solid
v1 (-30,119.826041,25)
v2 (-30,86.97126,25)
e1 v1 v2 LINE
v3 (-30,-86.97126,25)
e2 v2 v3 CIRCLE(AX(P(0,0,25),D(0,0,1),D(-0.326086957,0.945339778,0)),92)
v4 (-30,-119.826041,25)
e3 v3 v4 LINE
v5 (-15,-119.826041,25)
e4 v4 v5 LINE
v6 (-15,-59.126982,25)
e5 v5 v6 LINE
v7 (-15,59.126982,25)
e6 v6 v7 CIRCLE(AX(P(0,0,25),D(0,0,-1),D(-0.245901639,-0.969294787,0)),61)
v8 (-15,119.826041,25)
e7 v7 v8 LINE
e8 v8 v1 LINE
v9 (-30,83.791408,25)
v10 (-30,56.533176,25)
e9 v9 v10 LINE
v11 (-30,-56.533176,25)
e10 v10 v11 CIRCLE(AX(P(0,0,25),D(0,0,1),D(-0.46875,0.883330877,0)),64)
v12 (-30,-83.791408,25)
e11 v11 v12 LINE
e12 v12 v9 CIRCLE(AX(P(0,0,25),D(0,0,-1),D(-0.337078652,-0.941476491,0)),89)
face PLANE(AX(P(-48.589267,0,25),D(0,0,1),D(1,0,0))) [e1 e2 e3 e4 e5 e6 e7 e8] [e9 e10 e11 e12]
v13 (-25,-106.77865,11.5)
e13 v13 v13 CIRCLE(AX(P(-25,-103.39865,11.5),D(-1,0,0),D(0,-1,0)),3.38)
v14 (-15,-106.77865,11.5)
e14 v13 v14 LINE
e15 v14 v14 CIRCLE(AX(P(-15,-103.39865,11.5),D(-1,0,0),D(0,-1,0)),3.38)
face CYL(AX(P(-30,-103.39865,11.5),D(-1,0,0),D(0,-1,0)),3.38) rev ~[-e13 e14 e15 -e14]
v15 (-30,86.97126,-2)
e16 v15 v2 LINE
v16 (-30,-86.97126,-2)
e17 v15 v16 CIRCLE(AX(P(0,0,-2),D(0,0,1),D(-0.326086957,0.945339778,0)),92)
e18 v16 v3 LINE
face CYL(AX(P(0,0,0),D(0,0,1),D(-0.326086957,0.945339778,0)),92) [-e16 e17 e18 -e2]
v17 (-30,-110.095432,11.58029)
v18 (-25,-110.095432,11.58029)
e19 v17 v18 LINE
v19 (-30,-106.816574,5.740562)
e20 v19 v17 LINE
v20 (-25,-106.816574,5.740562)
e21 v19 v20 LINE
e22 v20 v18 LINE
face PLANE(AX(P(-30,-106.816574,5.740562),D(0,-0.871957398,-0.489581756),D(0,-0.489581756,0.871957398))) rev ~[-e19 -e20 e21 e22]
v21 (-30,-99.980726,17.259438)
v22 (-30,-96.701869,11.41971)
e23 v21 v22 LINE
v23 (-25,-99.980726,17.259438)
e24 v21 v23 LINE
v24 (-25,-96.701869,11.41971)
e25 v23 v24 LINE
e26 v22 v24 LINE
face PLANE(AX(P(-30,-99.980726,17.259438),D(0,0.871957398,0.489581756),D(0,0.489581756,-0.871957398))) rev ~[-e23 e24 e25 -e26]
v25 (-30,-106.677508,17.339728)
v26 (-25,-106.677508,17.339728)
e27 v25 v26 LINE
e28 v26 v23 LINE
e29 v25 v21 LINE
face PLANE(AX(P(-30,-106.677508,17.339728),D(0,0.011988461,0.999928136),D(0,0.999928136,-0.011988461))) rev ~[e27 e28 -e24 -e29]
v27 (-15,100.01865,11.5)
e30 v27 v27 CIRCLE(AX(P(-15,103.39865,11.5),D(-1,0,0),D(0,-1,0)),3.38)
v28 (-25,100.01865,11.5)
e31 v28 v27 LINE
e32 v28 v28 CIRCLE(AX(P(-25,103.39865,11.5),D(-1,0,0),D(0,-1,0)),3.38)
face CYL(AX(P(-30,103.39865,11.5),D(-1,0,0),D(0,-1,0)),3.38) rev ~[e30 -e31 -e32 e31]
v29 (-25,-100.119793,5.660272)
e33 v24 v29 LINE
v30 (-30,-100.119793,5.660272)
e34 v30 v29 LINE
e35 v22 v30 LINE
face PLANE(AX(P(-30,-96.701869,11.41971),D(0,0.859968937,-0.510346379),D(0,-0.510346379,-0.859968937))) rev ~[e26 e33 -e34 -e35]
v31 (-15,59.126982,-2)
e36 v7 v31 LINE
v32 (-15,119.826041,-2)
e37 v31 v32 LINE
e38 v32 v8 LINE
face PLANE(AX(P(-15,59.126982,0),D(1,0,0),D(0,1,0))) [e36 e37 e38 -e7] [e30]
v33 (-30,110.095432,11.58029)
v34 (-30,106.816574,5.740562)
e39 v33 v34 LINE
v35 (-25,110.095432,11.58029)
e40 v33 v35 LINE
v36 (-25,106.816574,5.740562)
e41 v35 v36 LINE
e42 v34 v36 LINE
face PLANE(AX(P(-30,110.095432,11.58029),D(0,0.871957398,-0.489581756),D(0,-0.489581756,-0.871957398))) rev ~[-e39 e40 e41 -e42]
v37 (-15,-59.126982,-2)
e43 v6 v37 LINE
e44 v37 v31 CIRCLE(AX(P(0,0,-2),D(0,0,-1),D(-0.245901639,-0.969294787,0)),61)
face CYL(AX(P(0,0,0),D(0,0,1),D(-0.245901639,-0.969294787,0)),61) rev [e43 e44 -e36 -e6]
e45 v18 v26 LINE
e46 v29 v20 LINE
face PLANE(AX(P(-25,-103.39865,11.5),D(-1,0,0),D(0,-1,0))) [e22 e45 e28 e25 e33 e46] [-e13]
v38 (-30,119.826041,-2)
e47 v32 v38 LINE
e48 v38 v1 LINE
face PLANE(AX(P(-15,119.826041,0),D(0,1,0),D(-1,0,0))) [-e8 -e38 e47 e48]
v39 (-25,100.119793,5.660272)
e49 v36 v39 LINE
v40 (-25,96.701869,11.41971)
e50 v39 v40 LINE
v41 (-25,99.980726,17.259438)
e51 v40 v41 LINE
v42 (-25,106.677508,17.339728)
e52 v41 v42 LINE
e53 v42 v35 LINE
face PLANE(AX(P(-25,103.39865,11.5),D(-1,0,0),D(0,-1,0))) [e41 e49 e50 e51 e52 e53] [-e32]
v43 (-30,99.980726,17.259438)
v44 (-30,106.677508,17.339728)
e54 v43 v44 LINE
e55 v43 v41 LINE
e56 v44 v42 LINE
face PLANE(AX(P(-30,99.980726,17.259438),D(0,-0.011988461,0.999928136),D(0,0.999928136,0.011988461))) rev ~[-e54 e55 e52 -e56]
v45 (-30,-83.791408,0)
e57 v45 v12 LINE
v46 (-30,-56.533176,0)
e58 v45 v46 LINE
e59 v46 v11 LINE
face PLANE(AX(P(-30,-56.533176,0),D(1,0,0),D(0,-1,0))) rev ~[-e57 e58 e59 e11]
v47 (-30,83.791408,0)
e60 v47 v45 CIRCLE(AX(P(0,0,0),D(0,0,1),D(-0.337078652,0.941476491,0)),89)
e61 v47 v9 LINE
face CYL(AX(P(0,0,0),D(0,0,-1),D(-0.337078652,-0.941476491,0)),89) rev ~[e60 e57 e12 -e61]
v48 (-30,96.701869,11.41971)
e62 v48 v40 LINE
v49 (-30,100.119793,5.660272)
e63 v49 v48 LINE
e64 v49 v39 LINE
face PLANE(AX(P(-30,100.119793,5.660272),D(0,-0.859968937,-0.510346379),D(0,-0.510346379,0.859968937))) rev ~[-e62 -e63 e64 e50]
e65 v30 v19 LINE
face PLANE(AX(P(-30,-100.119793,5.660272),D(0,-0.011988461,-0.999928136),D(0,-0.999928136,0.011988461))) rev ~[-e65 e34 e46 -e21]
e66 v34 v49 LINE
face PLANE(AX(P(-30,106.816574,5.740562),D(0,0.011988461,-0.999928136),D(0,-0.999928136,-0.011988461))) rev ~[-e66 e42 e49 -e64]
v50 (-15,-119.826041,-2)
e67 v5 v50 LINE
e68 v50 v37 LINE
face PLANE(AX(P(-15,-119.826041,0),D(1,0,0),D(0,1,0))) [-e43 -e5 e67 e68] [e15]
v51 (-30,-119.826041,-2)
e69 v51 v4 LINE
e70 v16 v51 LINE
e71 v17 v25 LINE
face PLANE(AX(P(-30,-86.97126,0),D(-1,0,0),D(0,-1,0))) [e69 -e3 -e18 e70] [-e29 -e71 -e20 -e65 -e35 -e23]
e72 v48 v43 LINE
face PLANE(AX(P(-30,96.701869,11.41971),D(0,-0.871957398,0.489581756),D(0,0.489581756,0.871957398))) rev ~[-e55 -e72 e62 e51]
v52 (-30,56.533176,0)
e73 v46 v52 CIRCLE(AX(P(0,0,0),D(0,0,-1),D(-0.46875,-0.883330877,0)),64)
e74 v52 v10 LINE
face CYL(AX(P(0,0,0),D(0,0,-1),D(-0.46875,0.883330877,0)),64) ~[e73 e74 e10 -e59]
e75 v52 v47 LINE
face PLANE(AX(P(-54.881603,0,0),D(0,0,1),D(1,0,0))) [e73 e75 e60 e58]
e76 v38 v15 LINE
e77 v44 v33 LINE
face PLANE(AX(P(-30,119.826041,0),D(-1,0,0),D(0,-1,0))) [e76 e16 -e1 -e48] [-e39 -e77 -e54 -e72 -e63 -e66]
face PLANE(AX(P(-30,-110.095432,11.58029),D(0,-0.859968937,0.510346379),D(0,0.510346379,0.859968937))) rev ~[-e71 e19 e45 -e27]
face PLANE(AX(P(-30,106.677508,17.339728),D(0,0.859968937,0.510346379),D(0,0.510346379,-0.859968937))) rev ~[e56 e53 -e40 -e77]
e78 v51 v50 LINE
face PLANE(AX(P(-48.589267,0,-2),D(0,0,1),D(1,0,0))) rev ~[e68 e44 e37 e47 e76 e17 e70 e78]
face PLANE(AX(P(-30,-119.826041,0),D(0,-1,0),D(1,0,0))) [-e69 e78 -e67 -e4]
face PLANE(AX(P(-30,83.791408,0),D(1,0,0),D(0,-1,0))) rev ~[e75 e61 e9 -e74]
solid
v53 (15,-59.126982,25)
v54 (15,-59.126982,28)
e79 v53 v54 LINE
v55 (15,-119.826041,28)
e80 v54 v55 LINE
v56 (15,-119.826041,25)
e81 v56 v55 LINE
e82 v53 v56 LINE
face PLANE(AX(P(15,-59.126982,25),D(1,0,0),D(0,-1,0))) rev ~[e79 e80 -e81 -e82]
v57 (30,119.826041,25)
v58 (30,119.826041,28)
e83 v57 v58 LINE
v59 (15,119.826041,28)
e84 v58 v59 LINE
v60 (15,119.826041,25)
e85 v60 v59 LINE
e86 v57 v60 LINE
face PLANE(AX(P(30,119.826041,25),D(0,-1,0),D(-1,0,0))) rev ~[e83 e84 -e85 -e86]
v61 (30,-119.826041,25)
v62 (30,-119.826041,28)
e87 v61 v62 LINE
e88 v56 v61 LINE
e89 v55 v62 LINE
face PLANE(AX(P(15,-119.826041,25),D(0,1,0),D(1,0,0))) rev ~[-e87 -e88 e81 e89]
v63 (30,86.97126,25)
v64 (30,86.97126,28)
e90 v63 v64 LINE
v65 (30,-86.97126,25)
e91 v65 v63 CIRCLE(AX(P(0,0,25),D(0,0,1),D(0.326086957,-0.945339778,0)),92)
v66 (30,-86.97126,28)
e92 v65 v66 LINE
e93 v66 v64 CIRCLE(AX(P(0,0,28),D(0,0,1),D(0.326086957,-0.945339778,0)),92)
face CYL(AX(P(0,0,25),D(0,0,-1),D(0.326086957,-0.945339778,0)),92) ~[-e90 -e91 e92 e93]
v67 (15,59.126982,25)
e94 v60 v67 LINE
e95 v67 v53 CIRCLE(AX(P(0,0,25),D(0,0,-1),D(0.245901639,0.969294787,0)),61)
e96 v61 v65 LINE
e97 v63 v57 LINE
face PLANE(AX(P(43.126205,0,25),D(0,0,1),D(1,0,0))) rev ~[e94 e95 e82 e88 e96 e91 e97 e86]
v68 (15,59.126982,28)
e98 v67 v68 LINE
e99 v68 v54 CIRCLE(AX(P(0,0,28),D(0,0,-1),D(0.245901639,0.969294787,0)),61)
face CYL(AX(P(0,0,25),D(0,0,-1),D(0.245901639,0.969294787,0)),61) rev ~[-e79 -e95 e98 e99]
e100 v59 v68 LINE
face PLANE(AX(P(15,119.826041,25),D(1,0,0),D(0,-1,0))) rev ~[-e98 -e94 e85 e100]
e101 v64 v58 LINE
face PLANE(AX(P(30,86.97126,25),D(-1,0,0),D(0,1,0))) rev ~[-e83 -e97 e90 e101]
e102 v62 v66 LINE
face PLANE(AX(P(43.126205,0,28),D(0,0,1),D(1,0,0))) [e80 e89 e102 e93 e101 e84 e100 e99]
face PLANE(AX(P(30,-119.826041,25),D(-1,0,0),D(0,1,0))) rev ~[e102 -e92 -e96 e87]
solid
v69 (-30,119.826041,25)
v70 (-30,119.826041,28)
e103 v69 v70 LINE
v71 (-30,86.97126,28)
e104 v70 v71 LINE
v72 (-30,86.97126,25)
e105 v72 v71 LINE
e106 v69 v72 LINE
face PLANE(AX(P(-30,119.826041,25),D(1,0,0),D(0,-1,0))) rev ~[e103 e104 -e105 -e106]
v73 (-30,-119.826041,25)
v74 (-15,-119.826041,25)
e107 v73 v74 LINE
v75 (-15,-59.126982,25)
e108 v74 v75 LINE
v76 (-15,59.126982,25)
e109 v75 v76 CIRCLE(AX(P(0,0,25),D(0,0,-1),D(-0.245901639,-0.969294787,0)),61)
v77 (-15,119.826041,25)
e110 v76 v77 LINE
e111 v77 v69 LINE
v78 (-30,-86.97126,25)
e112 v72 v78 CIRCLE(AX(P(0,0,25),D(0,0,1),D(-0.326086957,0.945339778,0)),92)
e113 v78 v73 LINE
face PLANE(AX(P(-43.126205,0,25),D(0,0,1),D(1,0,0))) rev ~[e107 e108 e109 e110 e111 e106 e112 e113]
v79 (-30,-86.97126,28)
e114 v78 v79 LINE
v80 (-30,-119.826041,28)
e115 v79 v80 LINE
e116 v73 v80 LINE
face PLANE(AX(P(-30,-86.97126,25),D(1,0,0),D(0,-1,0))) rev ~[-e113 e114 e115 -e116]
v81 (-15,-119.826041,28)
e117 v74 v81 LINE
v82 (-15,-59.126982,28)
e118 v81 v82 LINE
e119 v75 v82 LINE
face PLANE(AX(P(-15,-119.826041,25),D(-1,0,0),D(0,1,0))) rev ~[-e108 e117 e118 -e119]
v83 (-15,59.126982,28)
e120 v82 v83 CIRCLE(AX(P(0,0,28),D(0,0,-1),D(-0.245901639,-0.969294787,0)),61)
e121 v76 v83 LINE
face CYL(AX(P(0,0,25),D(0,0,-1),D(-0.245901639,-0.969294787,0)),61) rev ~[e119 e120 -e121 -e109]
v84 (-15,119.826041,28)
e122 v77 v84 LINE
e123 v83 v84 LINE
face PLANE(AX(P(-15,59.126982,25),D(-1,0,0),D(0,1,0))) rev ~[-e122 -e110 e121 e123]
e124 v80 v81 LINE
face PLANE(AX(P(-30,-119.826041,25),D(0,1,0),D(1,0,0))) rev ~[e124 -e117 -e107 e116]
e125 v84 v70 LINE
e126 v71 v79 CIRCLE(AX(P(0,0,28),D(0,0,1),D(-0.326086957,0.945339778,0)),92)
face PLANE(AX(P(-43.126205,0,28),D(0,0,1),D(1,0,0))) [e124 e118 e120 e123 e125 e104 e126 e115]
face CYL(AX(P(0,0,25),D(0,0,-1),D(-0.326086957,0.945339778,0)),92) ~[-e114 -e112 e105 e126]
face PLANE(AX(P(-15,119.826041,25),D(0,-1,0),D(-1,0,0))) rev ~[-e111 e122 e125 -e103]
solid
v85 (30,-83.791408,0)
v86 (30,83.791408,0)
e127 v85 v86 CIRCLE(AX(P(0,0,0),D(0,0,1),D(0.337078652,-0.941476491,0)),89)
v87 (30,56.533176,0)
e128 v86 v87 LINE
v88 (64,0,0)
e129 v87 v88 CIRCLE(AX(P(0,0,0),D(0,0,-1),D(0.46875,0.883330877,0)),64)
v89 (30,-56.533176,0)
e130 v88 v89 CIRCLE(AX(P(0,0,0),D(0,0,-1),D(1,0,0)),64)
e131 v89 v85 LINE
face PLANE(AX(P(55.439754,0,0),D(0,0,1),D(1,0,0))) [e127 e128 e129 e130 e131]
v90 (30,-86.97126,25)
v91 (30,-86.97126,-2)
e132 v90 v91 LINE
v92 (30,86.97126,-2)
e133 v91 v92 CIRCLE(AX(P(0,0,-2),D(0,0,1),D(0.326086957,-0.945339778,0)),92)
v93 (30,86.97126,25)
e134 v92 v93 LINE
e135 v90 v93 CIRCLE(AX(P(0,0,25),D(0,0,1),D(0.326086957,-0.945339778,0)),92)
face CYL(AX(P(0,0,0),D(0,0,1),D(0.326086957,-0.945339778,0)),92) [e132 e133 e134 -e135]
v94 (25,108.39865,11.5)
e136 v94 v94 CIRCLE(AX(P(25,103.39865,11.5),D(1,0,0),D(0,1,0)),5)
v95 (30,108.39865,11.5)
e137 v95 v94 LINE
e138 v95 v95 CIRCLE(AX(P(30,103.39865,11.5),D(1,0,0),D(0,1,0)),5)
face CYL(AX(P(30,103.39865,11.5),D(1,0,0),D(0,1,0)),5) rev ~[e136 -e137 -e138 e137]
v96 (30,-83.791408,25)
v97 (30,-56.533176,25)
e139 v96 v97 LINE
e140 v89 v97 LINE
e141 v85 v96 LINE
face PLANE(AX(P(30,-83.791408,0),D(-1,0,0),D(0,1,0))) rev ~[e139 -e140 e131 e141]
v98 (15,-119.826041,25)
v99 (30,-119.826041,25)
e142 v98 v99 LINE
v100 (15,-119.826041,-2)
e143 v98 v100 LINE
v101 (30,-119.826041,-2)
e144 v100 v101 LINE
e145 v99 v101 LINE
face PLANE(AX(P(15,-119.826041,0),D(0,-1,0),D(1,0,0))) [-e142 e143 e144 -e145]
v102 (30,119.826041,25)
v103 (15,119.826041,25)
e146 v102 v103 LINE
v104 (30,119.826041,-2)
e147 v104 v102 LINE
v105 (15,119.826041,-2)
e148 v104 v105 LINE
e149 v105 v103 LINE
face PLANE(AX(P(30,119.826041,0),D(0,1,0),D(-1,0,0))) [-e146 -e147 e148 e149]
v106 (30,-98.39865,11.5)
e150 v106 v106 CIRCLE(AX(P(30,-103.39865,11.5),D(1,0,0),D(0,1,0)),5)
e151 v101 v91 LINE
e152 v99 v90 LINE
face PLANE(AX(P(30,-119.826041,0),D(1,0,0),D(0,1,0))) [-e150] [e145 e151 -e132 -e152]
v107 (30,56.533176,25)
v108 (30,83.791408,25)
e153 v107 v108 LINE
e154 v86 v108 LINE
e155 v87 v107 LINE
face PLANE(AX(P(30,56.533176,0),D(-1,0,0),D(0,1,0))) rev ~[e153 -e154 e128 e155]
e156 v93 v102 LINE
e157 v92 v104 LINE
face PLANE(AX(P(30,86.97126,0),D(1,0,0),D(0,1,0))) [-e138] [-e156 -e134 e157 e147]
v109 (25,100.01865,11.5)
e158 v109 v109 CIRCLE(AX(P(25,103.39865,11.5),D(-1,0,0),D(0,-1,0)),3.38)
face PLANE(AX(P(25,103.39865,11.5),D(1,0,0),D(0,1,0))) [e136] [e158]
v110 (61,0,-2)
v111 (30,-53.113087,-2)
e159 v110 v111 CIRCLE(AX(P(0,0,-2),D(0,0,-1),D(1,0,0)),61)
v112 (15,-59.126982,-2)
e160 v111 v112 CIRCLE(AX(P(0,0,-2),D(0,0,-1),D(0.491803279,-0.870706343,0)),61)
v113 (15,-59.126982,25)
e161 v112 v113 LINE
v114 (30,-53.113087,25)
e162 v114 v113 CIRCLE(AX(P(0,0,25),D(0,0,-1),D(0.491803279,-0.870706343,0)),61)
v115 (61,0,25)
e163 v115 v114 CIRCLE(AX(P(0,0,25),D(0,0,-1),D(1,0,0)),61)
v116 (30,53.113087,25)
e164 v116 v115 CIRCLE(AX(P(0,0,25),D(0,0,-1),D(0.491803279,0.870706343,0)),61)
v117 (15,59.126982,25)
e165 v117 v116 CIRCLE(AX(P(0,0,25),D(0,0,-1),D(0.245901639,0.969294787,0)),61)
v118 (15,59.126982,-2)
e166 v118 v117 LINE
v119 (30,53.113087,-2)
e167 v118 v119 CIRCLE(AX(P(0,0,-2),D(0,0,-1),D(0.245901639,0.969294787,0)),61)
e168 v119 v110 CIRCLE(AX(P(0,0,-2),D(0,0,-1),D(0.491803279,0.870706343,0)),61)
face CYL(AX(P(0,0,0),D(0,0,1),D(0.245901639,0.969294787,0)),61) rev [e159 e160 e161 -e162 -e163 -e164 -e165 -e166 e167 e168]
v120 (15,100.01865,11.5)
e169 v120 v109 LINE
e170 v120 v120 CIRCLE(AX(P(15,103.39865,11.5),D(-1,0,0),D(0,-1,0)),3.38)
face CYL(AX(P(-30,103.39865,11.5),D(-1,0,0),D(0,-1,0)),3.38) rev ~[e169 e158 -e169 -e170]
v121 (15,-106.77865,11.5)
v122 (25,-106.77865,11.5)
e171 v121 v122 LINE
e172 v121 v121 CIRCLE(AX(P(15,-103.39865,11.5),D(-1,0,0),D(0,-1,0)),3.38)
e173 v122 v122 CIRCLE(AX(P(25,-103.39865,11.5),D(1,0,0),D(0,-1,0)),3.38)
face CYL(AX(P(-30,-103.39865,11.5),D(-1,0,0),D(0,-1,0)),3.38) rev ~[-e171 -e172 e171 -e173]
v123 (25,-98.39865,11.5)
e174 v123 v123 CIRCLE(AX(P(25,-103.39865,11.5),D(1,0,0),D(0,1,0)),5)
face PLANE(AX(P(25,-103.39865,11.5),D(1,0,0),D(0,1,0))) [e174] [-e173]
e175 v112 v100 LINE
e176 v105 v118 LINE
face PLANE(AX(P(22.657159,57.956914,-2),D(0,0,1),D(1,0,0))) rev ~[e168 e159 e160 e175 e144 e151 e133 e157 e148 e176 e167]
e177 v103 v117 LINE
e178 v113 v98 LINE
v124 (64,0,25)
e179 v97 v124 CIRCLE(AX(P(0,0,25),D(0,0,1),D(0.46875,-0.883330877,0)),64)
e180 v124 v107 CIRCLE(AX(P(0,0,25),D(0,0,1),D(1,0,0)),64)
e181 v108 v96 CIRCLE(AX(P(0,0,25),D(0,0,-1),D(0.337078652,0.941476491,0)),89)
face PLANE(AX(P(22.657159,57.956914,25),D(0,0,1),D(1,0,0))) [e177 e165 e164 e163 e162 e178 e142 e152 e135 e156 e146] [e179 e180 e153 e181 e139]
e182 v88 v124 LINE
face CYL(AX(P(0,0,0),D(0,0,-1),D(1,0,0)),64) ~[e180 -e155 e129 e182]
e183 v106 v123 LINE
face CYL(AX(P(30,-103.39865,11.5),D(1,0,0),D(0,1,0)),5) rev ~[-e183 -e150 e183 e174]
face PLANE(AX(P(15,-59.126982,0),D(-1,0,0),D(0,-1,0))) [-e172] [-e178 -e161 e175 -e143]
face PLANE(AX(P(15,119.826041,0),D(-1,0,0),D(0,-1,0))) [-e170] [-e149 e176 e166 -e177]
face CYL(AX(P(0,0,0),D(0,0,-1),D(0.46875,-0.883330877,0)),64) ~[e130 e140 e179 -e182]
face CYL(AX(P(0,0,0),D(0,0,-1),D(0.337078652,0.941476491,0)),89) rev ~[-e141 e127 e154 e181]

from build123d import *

# Parameters (mm, degrees)
F1_DEPTH      = 2
F2_DEPTH      = 25
F2_DEPTH_BACK = 2
F4_R          = 3.38
F5_DEPTH      = 122.001
F7_DEPTH      = 5
F9_DEPTH      = 3
F6_R          = 5
F6_R_2        = 3.38
F10_DEPTH     = 5


with BuildPart() as f1:
    # F0 (on Top) → F1 (new body)
    with BuildSketch(Plane.XY):
        with BuildLine():
            ThreePointArc((-30, -56.5331761004), (-64, 0), (-30, 56.5331761004))
            Line((-30, 56.5331761004), (-30, 83.7914076741))
            ThreePointArc((-30, 83.7914076741), (-89, 0), (-30, -83.7914076741))
            Line((-30, -83.7914076741), (-30, -56.5331761004))
        make_face()
    extrude(amount=-F1_DEPTH)

    # F0 (on Top) → F2 (join, two sides)
    with BuildSketch(Plane.XY) as f2_sk:
        with BuildLine():
            ThreePointArc((-30, -53.1130868996), (-61, 0), (-30, 53.1130868996))
            Line((-30, 53.1130868996), (-30, 56.5331761004))
            ThreePointArc((-30, 56.5331761004), (-64, 0), (-30, -56.5331761004))
            Line((-30, -56.5331761004), (-30, -53.1130868996))
        make_face()
        with BuildLine():
            ThreePointArc((-30, 53.1130868996), (-22.7000381841, 56.6189744383), (-15, 59.1269819964))
            Line((-15, 59.1269819964), (-15, 62.2173609212))
            ThreePointArc((-15, 62.2173609212), (-22.6787894137, 59.8470760416), (-30, 56.5331761004))
            Line((-30, 56.5331761004), (-30, 53.1130868996))
        make_face()
        with BuildLine():
            Line((-15, -87.7268487978), (-15, -62.2173609212))
            ThreePointArc((-15, -62.2173609212), (-22.6787894137, -59.8470760416), (-30, -56.5331761004))
            Line((-30, -56.5331761004), (-30, -83.7914076741))
            ThreePointArc((-30, -83.7914076741), (-22.5858788673, -86.0864569824), (-15, -87.7268487978))
        make_face()
        with BuildLine():
            Line((-15, -62.2173609212), (-15, -59.1269819964))
            ThreePointArc((-15, -59.1269819964), (-22.7000381841, -56.6189744383), (-30, -53.1130868996))
            Line((-30, -53.1130868996), (-30, -56.5331761004))
            ThreePointArc((-30, -56.5331761004), (-22.6787894137, -59.8470760416), (-15, -62.2173609212))
        make_face()
        with BuildLine():
            Line((-15, -90.768937418), (-15, -87.7268487978))
            ThreePointArc((-15, -87.7268487978), (-22.5858788673, -86.0864569824), (-30, -83.7914076741))
            Line((-30, -83.7914076741), (-30, -86.9712596206))
            ThreePointArc((-30, -86.9712596206), (-22.5799820452, -89.1860101744), (-15, -90.768937418))
        make_face()
        with BuildLine():
            Line((-15, -119.826041162), (-15, -90.768937418))
            ThreePointArc((-15, -90.768937418), (-22.5799820452, -89.1860101744), (-30, -86.9712596206))
            Line((-30, -86.9712596206), (-30, -119.826041162))
            Line((-30, -119.826041162), (-15, -119.826041162))
        make_face()
        with BuildLine():
            ThreePointArc((-30, -83.7914076741), (-89, 0), (-30, 83.7914076741))
            Line((-30, 83.7914076741), (-30, 86.9712596206))
            ThreePointArc((-30, 86.9712596206), (-92, 0), (-30, -86.9712596206))
            Line((-30, -86.9712596206), (-30, -83.7914076741))
        make_face()
        with BuildLine():
            ThreePointArc((-30, 56.5331761004), (-22.6787894137, 59.8470760416), (-15, 62.2173609212))
            Line((-15, 62.2173609212), (-15, 87.7268487978))
            ThreePointArc((-15, 87.7268487978), (-22.5858788673, 86.0864569824), (-30, 83.7914076741))
            Line((-30, 83.7914076741), (-30, 56.5331761004))
        make_face()
        with BuildLine():
            ThreePointArc((-30, 83.7914076741), (-22.5858788673, 86.0864569824), (-15, 87.7268487978))
            Line((-15, 87.7268487978), (-15, 90.768937418))
            ThreePointArc((-15, 90.768937418), (-22.5799820452, 89.1860101744), (-30, 86.9712596206))
            Line((-30, 86.9712596206), (-30, 83.7914076741))
        make_face()
        with BuildLine():
            ThreePointArc((-30, 86.9712596206), (-22.5799820452, 89.1860101744), (-15, 90.768937418))
            Line((-15, 90.768937418), (-15, 119.826041162))
            Line((-15, 119.826041162), (-30, 119.826041162))
            Line((-30, 119.826041162), (-30, 86.9712596206))
        make_face()
    extrude(amount=F2_DEPTH)
    extrude(f2_sk.sketch, amount=-F2_DEPTH_BACK)


with BuildPart() as f1b:
    # F0 (on Top) → F1, piece 2 (new body)
    with BuildSketch(Plane.XY):
        with BuildLine():
            Line((30, 83.7914076741), (30, 56.5331761004))
            ThreePointArc((30, 56.5331761004), (54.8452368032, 32.9848450049), (64, 0))
            ThreePointArc((64, 0), (54.8452368032, -32.9848450049), (30, -56.5331761004))
            Line((30, -56.5331761004), (30, -83.7914076741))
            ThreePointArc((30, -83.7914076741), (72.7701862029, -51.2396330978), (89, 0))
            ThreePointArc((89, 0), (72.7701862029, 51.2396330978), (30, 83.7914076741))
        make_face()
    extrude(amount=-F1_DEPTH)

    # F0 (on Top) → F2, piece 2 (join, two sides)
    with BuildSketch(Plane.XY) as f2_2_sk:
        with BuildLine():
            ThreePointArc((15, 59.1269819964), (22.7000381841, 56.6189744383), (30, 53.1130868996))
            Line((30, 53.1130868996), (30, 56.5331761004))
            ThreePointArc((30, 56.5331761004), (22.6787894137, 59.8470760416), (15, 62.2173609212))
            Line((15, 62.2173609212), (15, 59.1269819964))
        make_face()
        with BuildLine():
            ThreePointArc((30, 53.1130868996), (52.6830143405, 30.748983723), (61, 0))
            ThreePointArc((61, 0), (52.6830143405, -30.748983723), (30, -53.1130868996))
            Line((30, -53.1130868996), (30, -56.5331761004))
            ThreePointArc((30, -56.5331761004), (54.8452368032, -32.9848450049), (64, 0))
            ThreePointArc((64, 0), (54.8452368032, 32.9848450049), (30, 56.5331761004))
            Line((30, 56.5331761004), (30, 53.1130868996))
        make_face()
        with BuildLine():
            Line((30, -83.7914076741), (30, -56.5331761004))
            ThreePointArc((30, -56.5331761004), (22.6787894137, -59.8470760416), (15, -62.2173609212))
            Line((15, -62.2173609212), (15, -87.7268487978))
            ThreePointArc((15, -87.7268487978), (22.5858788673, -86.0864569824), (30, -83.7914076741))
        make_face()
        with BuildLine():
            Line((30, -56.5331761004), (30, -53.1130868996))
            ThreePointArc((30, -53.1130868996), (22.7000381841, -56.6189744383), (15, -59.1269819964))
            Line((15, -59.1269819964), (15, -62.2173609212))
            ThreePointArc((15, -62.2173609212), (22.6787894137, -59.8470760416), (30, -56.5331761004))
        make_face()
        with BuildLine():
            Line((30, -86.9712596206), (30, -83.7914076741))
            ThreePointArc((30, -83.7914076741), (22.5858788673, -86.0864569824), (15, -87.7268487978))
            Line((15, -87.7268487978), (15, -90.768937418))
            ThreePointArc((15, -90.768937418), (22.5799820452, -89.1860101744), (30, -86.9712596206))
        make_face()
        with BuildLine():
            Line((30, 86.9712596206), (30, 83.7914076741))
            ThreePointArc((30, 83.7914076741), (72.7701862029, 51.2396330978), (89, 0))
            ThreePointArc((89, 0), (72.7701862029, -51.2396330978), (30, -83.7914076741))
            Line((30, -83.7914076741), (30, -86.9712596206))
            ThreePointArc((30, -86.9712596206), (74.9132832013, -53.4041196913), (92, 0))
            ThreePointArc((92, 0), (74.9132832013, 53.4041196913), (30, 86.9712596206))
        make_face()
        with BuildLine():
            Line((30, -119.826041162), (30, -86.9712596206))
            ThreePointArc((30, -86.9712596206), (22.5799820452, -89.1860101744), (15, -90.768937418))
            Line((15, -90.768937418), (15, -119.826041162))
            Line((15, -119.826041162), (30, -119.826041162))
        make_face()
        with BuildLine():
            ThreePointArc((15, 62.2173609212), (22.6787894137, 59.8470760416), (30, 56.5331761004))
            Line((30, 56.5331761004), (30, 83.7914076741))
            ThreePointArc((30, 83.7914076741), (22.5858788673, 86.0864569824), (15, 87.7268487978))
            Line((15, 87.7268487978), (15, 62.2173609212))
        make_face()
        with BuildLine():
            ThreePointArc((15, 90.768937418), (22.5799820452, 89.1860101744), (30, 86.9712596206))
            Line((30, 86.9712596206), (30, 119.826041162))
            Line((30, 119.826041162), (15, 119.826041162))
            Line((15, 119.826041162), (15, 90.768937418))
        make_face()
        with BuildLine():
            ThreePointArc((15, 87.7268487978), (22.5858788673, 86.0864569824), (30, 83.7914076741))
            Line((30, 83.7914076741), (30, 86.9712596206))
            ThreePointArc((30, 86.9712596206), (22.5799820452, 89.1860101744), (15, 90.768937418))
            Line((15, 90.768937418), (15, 87.7268487978))
        make_face()
    extrude(amount=F2_DEPTH)
    extrude(f2_2_sk.sketch, amount=-F2_DEPTH_BACK)


with BuildPart() as f5_tool:
    # F4 (on face) → F5 (new body, through all)
    with BuildSketch(Plane(origin=(-30, 0, 0), x_dir=(0, -1, 0), z_dir=(-1, 0, 0))):
        with Locations((-103.3986503913, 11.5)):
            Circle(F4_R)
        with Locations((103.3986503913, 11.5)):
            Circle(F4_R)
    extrude(amount=-F5_DEPTH)


with BuildPart() as f1_1:
    add(f1.part)

    # F5: cut by f5_tool
    add(f5_tool.part, mode=Mode.SUBTRACT)

    # F4 (on face) → F7 (cut)
    with BuildSketch(Plane(origin=(-30, 0, 0), x_dir=(0, -1, 0), z_dir=(-1, 0, 0))):
        Polygon((-96.701868562, 11.4197101238), (-99.9807264042, 17.2594382497), (-106.6775082335, 17.3397281259), (-110.0954322206, 11.5802898762), (-106.8165743784, 5.7405617503), (-100.1197925491, 5.6602718741), align=None)
        with Locations((-103.3986503913, 11.5)):
            Circle(F4_R, mode=Mode.SUBTRACT)
        Polygon((106.6775082335, 17.3397281259), (99.9807264042, 17.2594382497), (96.701868562, 11.4197101238), (100.1197925491, 5.6602718741), (106.8165743784, 5.7405617503), (110.0954322206, 11.5802898762), align=None)
        with Locations((103.3986503913, 11.5)):
            Circle(F4_R, mode=Mode.SUBTRACT)
    extrude(amount=-F7_DEPTH, mode=Mode.SUBTRACT)


with BuildPart() as f1b_1:
    add(f1b.part)

    # F5: cut by f5_tool
    add(f5_tool.part, mode=Mode.SUBTRACT)

    # F6 (on face) → F10 (cut)
    with BuildSketch(Plane.YZ.offset(30)):
        with Locations((-103.3986503913, 11.5)):
            Circle(F6_R)
        with Locations((-103.3986503913, 11.5)):
            Circle(F6_R_2, mode=Mode.SUBTRACT)
        with Locations((103.3986503913, 11.5)):
            Circle(F6_R)
    extrude(amount=-F10_DEPTH, mode=Mode.SUBTRACT)


with BuildPart() as f9:
    # F8 (on face) → F9 (new body)
    with BuildSketch(Plane.XY.offset(25)):
        with BuildLine():
            Line((-15, 59.1269819964), (-15, 119.826041162))
            Line((-15, 119.826041162), (-30, 119.826041162))
            Line((-30, 119.826041162), (-30, 86.9712596206))
            ThreePointArc((-30, 86.9712596206), (-92, 0), (-30, -86.9712596206))
            Line((-30, -86.9712596206), (-30, -119.826041162))
            Line((-30, -119.826041162), (-15, -119.826041162))
            Line((-15, -119.826041162), (-15, -59.1269819964))
            ThreePointArc((-15, -59.1269819964), (-61, 0), (-15, 59.1269819964))
        make_face()
        with BuildLine():
            Line((-30, -56.5331761004), (-30, -83.7914076741))
            ThreePointArc((-30, -83.7914076741), (-89, 0), (-30, 83.7914076741))
            Line((-30, 83.7914076741), (-30, 56.5331761004))
            ThreePointArc((-30, 56.5331761004), (-64, 0), (-30, -56.5331761004))
        make_face(mode=Mode.SUBTRACT)
        with BuildLine():
            ThreePointArc((-30, 83.7914076741), (-89, 0), (-30, -83.7914076741))
            Line((-30, -83.7914076741), (-30, -56.5331761004))
            ThreePointArc((-30, -56.5331761004), (-64, 0), (-30, 56.5331761004))
            Line((-30, 56.5331761004), (-30, 83.7914076741))
        make_face()
    extrude(amount=F9_DEPTH)


with BuildPart() as f9b:
    # F8 (on face) → F9, piece 2 (new body)
    with BuildSketch(Plane.XY.offset(25)):
        with BuildLine():
            Line((30, 86.9712596206), (30, 119.826041162))
            Line((30, 119.826041162), (15, 119.826041162))
            Line((15, 119.826041162), (15, 59.1269819964))
            ThreePointArc((15, 59.1269819964), (61, 0), (15, -59.1269819964))
            Line((15, -59.1269819964), (15, -119.826041162))
            Line((15, -119.826041162), (30, -119.826041162))
            Line((30, -119.826041162), (30, -86.9712596206))
            ThreePointArc((30, -86.9712596206), (92, 0), (30, 86.9712596206))
        make_face()
    extrude(amount=F9_DEPTH)


solid = Compound([f1_1.part, f1b_1.part, f9.part, f9b.part])
